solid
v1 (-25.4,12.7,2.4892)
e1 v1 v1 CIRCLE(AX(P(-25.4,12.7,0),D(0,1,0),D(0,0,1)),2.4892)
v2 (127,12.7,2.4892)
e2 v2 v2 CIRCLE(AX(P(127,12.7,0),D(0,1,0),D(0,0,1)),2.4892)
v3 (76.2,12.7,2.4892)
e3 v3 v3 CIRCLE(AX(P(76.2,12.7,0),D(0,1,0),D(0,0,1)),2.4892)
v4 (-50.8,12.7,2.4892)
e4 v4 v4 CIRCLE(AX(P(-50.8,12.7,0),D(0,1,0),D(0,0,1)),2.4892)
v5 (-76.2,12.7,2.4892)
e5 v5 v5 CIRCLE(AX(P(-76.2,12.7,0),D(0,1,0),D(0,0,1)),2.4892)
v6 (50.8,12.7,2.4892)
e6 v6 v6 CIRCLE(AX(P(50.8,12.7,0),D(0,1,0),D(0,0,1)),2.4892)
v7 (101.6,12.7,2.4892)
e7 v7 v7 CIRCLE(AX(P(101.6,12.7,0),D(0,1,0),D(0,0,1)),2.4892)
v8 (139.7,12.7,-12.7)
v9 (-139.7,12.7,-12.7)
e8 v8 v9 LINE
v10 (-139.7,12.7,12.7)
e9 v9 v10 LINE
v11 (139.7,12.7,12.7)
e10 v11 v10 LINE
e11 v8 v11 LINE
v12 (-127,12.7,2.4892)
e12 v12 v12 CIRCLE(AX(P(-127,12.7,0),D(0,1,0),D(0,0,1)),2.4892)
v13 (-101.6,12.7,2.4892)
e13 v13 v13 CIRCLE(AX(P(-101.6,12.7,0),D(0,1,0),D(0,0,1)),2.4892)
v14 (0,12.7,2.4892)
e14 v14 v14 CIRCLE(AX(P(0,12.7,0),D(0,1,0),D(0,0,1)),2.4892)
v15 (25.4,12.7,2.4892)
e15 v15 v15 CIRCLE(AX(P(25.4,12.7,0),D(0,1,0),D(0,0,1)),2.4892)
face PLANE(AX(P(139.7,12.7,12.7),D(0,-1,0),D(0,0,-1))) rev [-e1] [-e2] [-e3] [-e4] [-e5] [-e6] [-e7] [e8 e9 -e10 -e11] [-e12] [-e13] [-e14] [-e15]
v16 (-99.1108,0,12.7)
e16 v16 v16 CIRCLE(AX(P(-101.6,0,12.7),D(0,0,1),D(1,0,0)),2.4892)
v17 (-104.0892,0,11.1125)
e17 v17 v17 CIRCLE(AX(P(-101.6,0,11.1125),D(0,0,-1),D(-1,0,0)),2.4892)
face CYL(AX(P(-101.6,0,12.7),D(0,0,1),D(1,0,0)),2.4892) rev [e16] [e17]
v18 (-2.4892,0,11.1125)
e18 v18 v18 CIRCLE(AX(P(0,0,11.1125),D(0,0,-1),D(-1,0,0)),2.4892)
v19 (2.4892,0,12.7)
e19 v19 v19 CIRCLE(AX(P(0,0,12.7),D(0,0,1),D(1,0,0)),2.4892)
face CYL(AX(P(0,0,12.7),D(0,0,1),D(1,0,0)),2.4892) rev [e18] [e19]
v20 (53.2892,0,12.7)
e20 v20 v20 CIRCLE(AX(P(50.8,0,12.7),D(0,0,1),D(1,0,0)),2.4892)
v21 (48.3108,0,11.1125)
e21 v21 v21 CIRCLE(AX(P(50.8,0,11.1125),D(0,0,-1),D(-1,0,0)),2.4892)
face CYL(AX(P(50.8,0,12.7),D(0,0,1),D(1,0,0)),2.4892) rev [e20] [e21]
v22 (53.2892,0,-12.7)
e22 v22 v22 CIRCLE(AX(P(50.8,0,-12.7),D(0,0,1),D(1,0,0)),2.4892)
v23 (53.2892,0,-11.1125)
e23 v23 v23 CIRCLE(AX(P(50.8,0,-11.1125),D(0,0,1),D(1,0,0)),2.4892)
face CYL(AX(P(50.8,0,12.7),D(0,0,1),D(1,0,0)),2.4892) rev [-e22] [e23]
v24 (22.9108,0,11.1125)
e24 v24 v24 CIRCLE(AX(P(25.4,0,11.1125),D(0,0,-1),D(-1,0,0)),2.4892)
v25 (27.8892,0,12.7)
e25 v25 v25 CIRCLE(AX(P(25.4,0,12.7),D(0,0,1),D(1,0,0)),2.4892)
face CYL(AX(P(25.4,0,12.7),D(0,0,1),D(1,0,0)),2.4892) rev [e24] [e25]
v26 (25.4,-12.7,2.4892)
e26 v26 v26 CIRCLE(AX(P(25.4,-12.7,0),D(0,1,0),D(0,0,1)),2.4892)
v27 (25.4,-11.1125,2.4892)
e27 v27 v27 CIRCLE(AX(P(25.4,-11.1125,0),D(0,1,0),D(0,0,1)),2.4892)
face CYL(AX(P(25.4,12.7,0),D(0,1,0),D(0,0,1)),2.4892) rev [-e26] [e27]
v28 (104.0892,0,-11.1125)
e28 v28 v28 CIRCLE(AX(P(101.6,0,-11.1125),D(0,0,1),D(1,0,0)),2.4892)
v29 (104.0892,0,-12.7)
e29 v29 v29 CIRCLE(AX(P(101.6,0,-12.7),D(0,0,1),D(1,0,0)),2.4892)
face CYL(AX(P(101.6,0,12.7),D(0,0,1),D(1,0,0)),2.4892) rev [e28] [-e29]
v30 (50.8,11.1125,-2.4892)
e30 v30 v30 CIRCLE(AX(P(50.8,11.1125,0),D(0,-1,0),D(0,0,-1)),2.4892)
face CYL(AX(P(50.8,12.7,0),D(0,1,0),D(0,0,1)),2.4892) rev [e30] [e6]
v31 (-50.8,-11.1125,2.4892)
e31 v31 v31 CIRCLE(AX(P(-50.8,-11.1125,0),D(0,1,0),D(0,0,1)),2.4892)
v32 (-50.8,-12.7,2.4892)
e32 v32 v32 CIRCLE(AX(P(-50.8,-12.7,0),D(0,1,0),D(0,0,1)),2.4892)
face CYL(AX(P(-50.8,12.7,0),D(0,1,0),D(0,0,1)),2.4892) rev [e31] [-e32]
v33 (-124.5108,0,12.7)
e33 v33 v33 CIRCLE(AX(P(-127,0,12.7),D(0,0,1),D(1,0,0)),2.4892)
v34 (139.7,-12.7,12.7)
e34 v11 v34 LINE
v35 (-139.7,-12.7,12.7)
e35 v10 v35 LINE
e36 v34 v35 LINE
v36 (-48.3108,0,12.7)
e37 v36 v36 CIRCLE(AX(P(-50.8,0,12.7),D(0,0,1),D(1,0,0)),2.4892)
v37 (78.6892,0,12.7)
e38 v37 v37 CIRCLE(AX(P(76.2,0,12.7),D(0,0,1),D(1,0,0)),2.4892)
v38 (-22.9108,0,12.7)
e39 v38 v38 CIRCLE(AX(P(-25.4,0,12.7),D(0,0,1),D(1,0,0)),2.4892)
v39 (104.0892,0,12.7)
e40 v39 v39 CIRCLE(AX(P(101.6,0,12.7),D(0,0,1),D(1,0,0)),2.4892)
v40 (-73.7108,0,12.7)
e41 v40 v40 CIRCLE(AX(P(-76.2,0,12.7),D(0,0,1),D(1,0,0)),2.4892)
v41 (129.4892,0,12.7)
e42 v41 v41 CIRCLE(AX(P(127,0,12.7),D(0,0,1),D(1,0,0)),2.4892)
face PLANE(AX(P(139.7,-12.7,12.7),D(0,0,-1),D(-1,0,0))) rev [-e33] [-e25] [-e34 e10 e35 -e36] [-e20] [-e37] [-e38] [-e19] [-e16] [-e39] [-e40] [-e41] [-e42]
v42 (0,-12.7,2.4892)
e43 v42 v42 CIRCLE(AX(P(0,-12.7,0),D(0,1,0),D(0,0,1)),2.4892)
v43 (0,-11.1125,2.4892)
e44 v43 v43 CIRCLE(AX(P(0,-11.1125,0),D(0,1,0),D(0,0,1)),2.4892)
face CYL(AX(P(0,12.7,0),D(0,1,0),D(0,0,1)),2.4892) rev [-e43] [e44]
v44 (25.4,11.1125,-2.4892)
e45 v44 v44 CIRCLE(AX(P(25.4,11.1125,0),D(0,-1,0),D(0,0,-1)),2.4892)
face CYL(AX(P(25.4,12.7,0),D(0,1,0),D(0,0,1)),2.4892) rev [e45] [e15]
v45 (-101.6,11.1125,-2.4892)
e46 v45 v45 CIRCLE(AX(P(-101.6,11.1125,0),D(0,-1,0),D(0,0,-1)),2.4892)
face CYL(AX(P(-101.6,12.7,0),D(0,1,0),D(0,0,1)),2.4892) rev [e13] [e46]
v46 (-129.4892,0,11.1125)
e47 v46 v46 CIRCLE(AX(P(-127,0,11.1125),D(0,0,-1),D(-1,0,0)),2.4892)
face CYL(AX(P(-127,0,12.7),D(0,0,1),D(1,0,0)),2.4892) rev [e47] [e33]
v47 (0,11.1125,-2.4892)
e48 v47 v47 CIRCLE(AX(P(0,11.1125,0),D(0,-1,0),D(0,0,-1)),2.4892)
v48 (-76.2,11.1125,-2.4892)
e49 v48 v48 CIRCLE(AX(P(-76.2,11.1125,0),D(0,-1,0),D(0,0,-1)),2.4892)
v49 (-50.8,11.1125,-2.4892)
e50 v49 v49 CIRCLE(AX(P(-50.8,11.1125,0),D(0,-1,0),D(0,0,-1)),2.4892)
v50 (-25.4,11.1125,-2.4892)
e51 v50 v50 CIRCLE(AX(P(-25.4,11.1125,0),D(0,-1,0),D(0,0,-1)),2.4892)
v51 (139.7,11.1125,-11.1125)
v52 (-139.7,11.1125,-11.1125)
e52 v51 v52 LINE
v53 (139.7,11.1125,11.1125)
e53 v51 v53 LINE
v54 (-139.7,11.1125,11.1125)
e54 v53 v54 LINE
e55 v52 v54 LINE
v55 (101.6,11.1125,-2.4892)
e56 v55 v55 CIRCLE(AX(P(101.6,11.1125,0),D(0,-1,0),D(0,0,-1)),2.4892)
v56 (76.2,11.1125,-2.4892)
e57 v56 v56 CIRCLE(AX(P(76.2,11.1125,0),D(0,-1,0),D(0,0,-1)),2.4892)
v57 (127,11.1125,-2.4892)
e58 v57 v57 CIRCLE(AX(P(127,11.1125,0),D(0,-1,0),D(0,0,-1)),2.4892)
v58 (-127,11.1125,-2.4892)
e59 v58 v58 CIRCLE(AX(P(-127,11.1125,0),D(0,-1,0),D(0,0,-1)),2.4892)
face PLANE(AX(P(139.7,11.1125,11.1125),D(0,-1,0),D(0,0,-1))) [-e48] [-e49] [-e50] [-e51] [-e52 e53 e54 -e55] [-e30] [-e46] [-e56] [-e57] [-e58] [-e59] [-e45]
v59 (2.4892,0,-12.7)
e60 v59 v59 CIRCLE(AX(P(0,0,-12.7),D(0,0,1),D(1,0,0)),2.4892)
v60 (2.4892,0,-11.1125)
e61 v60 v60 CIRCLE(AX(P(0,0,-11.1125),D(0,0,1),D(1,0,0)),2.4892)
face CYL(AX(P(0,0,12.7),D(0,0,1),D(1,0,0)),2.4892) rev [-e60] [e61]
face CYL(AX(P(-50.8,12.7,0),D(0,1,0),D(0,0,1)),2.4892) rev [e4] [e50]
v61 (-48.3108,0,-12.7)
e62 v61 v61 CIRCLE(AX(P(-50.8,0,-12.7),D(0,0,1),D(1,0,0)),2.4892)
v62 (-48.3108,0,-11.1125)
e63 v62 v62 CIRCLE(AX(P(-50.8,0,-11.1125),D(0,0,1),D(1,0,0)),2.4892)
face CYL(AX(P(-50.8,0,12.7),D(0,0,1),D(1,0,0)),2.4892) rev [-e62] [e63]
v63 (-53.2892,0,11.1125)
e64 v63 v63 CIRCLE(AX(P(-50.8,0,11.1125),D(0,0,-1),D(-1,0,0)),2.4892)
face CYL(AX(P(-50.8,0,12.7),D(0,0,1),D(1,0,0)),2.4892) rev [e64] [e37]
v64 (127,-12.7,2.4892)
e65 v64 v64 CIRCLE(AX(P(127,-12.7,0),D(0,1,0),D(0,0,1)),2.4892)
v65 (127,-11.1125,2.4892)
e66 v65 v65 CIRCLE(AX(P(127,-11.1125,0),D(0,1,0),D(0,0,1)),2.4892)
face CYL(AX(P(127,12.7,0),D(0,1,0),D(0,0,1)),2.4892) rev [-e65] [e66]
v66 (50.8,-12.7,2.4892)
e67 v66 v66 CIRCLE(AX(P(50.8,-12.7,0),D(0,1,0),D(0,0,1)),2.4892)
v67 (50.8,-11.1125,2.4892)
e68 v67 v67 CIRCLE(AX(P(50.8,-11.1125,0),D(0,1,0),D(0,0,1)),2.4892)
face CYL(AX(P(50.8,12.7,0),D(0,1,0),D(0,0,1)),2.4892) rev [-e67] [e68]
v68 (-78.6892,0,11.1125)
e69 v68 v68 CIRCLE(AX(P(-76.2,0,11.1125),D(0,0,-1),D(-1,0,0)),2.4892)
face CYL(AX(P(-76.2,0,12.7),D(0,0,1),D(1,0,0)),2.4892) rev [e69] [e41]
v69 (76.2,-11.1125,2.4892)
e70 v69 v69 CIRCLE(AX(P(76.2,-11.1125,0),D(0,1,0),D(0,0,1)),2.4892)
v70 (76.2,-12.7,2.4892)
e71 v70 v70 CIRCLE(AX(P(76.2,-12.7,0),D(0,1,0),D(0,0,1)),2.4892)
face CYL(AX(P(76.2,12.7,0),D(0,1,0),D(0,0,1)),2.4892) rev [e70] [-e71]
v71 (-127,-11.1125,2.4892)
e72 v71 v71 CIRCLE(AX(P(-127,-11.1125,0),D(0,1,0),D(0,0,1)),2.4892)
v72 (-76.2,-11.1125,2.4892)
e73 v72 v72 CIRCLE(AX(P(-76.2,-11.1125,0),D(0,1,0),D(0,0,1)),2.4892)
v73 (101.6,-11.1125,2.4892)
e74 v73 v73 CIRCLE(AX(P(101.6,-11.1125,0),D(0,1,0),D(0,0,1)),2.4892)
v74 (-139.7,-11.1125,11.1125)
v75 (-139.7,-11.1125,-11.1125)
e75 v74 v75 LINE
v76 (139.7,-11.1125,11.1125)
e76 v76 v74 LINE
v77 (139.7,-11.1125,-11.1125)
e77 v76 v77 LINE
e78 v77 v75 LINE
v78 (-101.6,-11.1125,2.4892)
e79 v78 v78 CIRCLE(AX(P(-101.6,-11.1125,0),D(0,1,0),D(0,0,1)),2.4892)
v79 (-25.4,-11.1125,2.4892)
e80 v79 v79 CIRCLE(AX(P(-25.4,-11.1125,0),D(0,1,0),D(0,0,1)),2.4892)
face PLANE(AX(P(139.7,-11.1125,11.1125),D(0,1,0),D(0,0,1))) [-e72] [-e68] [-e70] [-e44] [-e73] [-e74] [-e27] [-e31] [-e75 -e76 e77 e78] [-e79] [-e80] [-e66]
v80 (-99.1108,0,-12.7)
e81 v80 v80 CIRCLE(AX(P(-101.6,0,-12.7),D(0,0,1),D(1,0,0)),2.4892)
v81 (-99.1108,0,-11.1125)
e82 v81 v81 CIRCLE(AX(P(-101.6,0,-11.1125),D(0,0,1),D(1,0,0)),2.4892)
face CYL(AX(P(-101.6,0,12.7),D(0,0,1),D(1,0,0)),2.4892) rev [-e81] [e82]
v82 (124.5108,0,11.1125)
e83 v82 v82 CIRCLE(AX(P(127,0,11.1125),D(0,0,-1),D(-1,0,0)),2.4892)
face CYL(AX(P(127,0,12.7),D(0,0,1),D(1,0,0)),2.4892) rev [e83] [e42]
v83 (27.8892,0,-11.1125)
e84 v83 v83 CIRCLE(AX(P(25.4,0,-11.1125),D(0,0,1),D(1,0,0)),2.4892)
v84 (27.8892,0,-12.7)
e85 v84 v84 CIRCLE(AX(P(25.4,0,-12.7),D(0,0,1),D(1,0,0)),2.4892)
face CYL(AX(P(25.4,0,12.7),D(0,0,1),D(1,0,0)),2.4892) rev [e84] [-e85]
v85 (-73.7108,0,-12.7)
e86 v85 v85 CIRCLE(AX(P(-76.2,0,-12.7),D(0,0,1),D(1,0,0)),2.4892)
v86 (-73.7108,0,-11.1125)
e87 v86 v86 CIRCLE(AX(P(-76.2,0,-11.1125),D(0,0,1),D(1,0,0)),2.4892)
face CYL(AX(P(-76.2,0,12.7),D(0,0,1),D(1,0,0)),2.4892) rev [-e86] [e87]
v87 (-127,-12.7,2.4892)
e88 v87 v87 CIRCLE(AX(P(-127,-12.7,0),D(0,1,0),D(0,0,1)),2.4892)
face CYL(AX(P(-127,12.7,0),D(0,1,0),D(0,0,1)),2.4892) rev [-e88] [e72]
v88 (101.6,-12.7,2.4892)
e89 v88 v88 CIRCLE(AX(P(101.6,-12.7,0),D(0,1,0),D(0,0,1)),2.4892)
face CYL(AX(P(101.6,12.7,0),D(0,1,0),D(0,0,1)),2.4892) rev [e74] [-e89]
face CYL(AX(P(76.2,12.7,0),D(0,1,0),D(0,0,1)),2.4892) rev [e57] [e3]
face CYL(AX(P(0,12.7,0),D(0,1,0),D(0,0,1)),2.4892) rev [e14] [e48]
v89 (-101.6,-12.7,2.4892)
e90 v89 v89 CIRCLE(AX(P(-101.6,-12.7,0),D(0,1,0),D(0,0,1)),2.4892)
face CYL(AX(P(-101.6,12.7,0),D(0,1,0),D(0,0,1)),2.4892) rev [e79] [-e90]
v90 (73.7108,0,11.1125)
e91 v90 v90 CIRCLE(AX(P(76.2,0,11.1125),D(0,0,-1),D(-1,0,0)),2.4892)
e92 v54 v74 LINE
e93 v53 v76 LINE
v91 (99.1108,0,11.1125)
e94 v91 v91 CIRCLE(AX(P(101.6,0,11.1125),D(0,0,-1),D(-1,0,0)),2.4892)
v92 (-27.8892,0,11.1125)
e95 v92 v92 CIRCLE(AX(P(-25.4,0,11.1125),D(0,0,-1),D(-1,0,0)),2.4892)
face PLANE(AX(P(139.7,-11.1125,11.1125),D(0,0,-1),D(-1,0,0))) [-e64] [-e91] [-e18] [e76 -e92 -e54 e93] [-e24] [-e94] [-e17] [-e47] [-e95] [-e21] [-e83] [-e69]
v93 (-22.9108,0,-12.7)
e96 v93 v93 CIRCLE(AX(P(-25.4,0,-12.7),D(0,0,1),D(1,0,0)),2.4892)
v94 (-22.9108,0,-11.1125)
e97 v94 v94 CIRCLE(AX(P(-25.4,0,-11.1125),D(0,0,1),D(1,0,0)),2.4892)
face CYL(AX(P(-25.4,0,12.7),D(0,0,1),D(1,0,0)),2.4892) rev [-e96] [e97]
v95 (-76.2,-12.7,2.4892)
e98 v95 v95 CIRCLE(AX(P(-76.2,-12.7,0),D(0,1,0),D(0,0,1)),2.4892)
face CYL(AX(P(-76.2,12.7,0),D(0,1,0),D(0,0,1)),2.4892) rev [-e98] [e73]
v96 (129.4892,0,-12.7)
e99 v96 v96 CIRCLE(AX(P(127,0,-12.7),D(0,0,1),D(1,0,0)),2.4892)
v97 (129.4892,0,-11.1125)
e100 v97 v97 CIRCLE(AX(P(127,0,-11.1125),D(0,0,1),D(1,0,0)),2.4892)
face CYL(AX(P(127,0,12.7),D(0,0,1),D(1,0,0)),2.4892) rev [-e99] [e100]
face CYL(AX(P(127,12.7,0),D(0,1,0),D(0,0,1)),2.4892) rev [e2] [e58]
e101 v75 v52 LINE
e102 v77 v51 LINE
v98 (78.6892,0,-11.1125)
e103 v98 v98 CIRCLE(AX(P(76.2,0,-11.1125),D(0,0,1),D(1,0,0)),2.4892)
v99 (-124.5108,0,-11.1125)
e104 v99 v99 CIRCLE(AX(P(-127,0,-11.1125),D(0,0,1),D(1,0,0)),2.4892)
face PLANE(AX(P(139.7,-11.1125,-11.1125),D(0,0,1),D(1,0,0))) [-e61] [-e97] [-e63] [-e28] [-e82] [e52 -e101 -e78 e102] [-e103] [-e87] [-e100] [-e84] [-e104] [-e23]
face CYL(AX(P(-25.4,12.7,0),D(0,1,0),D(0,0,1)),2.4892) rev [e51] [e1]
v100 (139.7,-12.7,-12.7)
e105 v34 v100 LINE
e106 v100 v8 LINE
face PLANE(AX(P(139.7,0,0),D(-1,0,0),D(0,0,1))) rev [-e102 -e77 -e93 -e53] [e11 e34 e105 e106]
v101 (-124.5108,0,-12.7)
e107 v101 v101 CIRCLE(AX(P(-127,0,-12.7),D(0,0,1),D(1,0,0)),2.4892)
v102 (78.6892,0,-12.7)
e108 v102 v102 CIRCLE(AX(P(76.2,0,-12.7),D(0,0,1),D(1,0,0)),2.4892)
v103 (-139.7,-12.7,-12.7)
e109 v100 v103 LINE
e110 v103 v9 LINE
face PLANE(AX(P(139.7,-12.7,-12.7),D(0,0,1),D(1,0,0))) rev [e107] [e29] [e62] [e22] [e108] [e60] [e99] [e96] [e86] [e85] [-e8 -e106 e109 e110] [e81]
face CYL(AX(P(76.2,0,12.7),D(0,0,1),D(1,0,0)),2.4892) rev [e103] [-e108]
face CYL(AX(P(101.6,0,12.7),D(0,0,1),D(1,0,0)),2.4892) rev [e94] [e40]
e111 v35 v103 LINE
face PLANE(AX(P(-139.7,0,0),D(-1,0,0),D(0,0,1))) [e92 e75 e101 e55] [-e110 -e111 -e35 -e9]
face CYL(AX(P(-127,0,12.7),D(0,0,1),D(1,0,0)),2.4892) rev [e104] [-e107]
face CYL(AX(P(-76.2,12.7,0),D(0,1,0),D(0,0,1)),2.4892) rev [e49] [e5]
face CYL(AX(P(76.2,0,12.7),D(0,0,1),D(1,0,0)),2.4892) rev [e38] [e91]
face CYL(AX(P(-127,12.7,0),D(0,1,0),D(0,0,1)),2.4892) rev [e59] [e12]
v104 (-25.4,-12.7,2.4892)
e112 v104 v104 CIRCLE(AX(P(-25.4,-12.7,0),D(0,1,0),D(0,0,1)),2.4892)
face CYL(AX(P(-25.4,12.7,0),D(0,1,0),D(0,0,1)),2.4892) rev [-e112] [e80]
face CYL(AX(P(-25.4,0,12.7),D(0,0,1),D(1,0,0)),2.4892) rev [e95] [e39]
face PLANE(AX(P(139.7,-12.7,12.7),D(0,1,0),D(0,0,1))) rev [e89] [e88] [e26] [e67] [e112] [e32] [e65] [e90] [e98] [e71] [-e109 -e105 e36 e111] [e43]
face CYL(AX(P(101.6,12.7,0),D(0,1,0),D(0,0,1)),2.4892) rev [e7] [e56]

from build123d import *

# Parameters (mm, degrees)
SKETCH1_W             = 25.4
SKETCH1_H             = 25.4
SKETCH1_W_2           = 22.225
SKETCH1_H_2           = 22.225
BOSS_EXTRUDE1_DEPTH   = 139.7
SKETCH3_W             = 2.4892
SKETCH3_H             = 25.4
SKETCH3_AT_POINT_2_W  = 2.4892
SKETCH3_AT_POINT_2_H  = 25.4
LPATTERN1_START       = -12.7
LPATTERN1_OUTLINE_R   = 2.4892
LPATTERN1_DEPTH       = 25.4
LPATTERN1_2_OUTLINE_R = 2.4892
LPATTERN1_2_DEPTH     = 25.4


# Read off the part's stored shape, not the designer's step: LPattern1
with BuildPart() as part:
    # Sketch1 → Boss-Extrude1 (new, symmetric)
    with BuildSketch(Plane(origin=(0, 0, 0), x_dir=(0, 0, -1), z_dir=(1, 0, 0))):
        Rectangle(SKETCH1_W, SKETCH1_H)
        Rectangle(SKETCH1_W_2, SKETCH1_H_2, mode=Mode.SUBTRACT)
    extrude(amount=BOSS_EXTRUDE1_DEPTH, both=True)

    # Sketch3 → #9 (0.196) Diameter Hole1 (revolve, cut)
    with BuildSketch(Plane(origin=(127, 12.7, 0), x_dir=(0, 0, 1), z_dir=(1, 0, 0))):
        with Locations((1.2446, 12.7)):
            Rectangle(SKETCH3_W, SKETCH3_H)
    revolve(axis=Axis((127, 19.05, 0), (0, -1, 0)), mode=Mode.SUBTRACT)

    # Sketch3 at point 2 (carried to point 2, square into its face) → #9 (0.196) Diameter Hole1 at 2 (revolve, cut)
    with BuildSketch(Plane(origin=(127, 0, 12.7), x_dir=(0, -1, 0), z_dir=(1, 0, 0))):
        with Locations((1.2446, 12.7)):
            Rectangle(SKETCH3_AT_POINT_2_W, SKETCH3_AT_POINT_2_H)
    revolve(axis=Axis((127, 0, 19.05), (0, 0, -1)), mode=Mode.SUBTRACT)

    # LPattern1 outline → LPattern1 (cut)
    with BuildSketch(Plane.XY.offset(LPATTERN1_START)):
        with Locations((101.6, 0)):
            Circle(LPATTERN1_OUTLINE_R)
        with Locations((76.2, 0)):
            Circle(LPATTERN1_OUTLINE_R)
        with Locations((50.8, 0)):
            Circle(LPATTERN1_OUTLINE_R)
        with Locations((25.4, 0)):
            Circle(LPATTERN1_OUTLINE_R)
        Circle(LPATTERN1_OUTLINE_R)
        with Locations((-25.4, 0)):
            Circle(LPATTERN1_OUTLINE_R)
        with Locations((-50.8, 0)):
            Circle(LPATTERN1_OUTLINE_R)
        with Locations((-76.2, 0)):
            Circle(LPATTERN1_OUTLINE_R)
        with Locations((-101.6, 0)):
            Circle(LPATTERN1_OUTLINE_R)
        with Locations((-127, 0)):
            Circle(LPATTERN1_OUTLINE_R)
    extrude(amount=LPATTERN1_DEPTH, mode=Mode.SUBTRACT)

    # LPattern1 2 outline → LPattern1 2 (cut)
    with BuildSketch(Plane(origin=(0, 0, 0), x_dir=(1, 0, 0), z_dir=(0, 1, 0)).offset(LPATTERN1_START)):
        with Locations((101.6, 0)):
            Circle(LPATTERN1_2_OUTLINE_R)
        with Locations((76.2, 0)):
            Circle(LPATTERN1_2_OUTLINE_R)
        with Locations((50.8, 0)):
            Circle(LPATTERN1_2_OUTLINE_R)
        with Locations((25.4, 0)):
            Circle(LPATTERN1_2_OUTLINE_R)
        Circle(LPATTERN1_2_OUTLINE_R)
        with Locations((-25.4, 0)):
            Circle(LPATTERN1_2_OUTLINE_R)
        with Locations((-50.8, 0)):
            Circle(LPATTERN1_2_OUTLINE_R)
        with Locations((-76.2, 0)):
            Circle(LPATTERN1_2_OUTLINE_R)
        with Locations((-101.6, 0)):
            Circle(LPATTERN1_2_OUTLINE_R)
        with Locations((-127, 0)):
            Circle(LPATTERN1_2_OUTLINE_R)
    extrude(amount=LPATTERN1_2_DEPTH, mode=Mode.SUBTRACT)


solid = part.part
